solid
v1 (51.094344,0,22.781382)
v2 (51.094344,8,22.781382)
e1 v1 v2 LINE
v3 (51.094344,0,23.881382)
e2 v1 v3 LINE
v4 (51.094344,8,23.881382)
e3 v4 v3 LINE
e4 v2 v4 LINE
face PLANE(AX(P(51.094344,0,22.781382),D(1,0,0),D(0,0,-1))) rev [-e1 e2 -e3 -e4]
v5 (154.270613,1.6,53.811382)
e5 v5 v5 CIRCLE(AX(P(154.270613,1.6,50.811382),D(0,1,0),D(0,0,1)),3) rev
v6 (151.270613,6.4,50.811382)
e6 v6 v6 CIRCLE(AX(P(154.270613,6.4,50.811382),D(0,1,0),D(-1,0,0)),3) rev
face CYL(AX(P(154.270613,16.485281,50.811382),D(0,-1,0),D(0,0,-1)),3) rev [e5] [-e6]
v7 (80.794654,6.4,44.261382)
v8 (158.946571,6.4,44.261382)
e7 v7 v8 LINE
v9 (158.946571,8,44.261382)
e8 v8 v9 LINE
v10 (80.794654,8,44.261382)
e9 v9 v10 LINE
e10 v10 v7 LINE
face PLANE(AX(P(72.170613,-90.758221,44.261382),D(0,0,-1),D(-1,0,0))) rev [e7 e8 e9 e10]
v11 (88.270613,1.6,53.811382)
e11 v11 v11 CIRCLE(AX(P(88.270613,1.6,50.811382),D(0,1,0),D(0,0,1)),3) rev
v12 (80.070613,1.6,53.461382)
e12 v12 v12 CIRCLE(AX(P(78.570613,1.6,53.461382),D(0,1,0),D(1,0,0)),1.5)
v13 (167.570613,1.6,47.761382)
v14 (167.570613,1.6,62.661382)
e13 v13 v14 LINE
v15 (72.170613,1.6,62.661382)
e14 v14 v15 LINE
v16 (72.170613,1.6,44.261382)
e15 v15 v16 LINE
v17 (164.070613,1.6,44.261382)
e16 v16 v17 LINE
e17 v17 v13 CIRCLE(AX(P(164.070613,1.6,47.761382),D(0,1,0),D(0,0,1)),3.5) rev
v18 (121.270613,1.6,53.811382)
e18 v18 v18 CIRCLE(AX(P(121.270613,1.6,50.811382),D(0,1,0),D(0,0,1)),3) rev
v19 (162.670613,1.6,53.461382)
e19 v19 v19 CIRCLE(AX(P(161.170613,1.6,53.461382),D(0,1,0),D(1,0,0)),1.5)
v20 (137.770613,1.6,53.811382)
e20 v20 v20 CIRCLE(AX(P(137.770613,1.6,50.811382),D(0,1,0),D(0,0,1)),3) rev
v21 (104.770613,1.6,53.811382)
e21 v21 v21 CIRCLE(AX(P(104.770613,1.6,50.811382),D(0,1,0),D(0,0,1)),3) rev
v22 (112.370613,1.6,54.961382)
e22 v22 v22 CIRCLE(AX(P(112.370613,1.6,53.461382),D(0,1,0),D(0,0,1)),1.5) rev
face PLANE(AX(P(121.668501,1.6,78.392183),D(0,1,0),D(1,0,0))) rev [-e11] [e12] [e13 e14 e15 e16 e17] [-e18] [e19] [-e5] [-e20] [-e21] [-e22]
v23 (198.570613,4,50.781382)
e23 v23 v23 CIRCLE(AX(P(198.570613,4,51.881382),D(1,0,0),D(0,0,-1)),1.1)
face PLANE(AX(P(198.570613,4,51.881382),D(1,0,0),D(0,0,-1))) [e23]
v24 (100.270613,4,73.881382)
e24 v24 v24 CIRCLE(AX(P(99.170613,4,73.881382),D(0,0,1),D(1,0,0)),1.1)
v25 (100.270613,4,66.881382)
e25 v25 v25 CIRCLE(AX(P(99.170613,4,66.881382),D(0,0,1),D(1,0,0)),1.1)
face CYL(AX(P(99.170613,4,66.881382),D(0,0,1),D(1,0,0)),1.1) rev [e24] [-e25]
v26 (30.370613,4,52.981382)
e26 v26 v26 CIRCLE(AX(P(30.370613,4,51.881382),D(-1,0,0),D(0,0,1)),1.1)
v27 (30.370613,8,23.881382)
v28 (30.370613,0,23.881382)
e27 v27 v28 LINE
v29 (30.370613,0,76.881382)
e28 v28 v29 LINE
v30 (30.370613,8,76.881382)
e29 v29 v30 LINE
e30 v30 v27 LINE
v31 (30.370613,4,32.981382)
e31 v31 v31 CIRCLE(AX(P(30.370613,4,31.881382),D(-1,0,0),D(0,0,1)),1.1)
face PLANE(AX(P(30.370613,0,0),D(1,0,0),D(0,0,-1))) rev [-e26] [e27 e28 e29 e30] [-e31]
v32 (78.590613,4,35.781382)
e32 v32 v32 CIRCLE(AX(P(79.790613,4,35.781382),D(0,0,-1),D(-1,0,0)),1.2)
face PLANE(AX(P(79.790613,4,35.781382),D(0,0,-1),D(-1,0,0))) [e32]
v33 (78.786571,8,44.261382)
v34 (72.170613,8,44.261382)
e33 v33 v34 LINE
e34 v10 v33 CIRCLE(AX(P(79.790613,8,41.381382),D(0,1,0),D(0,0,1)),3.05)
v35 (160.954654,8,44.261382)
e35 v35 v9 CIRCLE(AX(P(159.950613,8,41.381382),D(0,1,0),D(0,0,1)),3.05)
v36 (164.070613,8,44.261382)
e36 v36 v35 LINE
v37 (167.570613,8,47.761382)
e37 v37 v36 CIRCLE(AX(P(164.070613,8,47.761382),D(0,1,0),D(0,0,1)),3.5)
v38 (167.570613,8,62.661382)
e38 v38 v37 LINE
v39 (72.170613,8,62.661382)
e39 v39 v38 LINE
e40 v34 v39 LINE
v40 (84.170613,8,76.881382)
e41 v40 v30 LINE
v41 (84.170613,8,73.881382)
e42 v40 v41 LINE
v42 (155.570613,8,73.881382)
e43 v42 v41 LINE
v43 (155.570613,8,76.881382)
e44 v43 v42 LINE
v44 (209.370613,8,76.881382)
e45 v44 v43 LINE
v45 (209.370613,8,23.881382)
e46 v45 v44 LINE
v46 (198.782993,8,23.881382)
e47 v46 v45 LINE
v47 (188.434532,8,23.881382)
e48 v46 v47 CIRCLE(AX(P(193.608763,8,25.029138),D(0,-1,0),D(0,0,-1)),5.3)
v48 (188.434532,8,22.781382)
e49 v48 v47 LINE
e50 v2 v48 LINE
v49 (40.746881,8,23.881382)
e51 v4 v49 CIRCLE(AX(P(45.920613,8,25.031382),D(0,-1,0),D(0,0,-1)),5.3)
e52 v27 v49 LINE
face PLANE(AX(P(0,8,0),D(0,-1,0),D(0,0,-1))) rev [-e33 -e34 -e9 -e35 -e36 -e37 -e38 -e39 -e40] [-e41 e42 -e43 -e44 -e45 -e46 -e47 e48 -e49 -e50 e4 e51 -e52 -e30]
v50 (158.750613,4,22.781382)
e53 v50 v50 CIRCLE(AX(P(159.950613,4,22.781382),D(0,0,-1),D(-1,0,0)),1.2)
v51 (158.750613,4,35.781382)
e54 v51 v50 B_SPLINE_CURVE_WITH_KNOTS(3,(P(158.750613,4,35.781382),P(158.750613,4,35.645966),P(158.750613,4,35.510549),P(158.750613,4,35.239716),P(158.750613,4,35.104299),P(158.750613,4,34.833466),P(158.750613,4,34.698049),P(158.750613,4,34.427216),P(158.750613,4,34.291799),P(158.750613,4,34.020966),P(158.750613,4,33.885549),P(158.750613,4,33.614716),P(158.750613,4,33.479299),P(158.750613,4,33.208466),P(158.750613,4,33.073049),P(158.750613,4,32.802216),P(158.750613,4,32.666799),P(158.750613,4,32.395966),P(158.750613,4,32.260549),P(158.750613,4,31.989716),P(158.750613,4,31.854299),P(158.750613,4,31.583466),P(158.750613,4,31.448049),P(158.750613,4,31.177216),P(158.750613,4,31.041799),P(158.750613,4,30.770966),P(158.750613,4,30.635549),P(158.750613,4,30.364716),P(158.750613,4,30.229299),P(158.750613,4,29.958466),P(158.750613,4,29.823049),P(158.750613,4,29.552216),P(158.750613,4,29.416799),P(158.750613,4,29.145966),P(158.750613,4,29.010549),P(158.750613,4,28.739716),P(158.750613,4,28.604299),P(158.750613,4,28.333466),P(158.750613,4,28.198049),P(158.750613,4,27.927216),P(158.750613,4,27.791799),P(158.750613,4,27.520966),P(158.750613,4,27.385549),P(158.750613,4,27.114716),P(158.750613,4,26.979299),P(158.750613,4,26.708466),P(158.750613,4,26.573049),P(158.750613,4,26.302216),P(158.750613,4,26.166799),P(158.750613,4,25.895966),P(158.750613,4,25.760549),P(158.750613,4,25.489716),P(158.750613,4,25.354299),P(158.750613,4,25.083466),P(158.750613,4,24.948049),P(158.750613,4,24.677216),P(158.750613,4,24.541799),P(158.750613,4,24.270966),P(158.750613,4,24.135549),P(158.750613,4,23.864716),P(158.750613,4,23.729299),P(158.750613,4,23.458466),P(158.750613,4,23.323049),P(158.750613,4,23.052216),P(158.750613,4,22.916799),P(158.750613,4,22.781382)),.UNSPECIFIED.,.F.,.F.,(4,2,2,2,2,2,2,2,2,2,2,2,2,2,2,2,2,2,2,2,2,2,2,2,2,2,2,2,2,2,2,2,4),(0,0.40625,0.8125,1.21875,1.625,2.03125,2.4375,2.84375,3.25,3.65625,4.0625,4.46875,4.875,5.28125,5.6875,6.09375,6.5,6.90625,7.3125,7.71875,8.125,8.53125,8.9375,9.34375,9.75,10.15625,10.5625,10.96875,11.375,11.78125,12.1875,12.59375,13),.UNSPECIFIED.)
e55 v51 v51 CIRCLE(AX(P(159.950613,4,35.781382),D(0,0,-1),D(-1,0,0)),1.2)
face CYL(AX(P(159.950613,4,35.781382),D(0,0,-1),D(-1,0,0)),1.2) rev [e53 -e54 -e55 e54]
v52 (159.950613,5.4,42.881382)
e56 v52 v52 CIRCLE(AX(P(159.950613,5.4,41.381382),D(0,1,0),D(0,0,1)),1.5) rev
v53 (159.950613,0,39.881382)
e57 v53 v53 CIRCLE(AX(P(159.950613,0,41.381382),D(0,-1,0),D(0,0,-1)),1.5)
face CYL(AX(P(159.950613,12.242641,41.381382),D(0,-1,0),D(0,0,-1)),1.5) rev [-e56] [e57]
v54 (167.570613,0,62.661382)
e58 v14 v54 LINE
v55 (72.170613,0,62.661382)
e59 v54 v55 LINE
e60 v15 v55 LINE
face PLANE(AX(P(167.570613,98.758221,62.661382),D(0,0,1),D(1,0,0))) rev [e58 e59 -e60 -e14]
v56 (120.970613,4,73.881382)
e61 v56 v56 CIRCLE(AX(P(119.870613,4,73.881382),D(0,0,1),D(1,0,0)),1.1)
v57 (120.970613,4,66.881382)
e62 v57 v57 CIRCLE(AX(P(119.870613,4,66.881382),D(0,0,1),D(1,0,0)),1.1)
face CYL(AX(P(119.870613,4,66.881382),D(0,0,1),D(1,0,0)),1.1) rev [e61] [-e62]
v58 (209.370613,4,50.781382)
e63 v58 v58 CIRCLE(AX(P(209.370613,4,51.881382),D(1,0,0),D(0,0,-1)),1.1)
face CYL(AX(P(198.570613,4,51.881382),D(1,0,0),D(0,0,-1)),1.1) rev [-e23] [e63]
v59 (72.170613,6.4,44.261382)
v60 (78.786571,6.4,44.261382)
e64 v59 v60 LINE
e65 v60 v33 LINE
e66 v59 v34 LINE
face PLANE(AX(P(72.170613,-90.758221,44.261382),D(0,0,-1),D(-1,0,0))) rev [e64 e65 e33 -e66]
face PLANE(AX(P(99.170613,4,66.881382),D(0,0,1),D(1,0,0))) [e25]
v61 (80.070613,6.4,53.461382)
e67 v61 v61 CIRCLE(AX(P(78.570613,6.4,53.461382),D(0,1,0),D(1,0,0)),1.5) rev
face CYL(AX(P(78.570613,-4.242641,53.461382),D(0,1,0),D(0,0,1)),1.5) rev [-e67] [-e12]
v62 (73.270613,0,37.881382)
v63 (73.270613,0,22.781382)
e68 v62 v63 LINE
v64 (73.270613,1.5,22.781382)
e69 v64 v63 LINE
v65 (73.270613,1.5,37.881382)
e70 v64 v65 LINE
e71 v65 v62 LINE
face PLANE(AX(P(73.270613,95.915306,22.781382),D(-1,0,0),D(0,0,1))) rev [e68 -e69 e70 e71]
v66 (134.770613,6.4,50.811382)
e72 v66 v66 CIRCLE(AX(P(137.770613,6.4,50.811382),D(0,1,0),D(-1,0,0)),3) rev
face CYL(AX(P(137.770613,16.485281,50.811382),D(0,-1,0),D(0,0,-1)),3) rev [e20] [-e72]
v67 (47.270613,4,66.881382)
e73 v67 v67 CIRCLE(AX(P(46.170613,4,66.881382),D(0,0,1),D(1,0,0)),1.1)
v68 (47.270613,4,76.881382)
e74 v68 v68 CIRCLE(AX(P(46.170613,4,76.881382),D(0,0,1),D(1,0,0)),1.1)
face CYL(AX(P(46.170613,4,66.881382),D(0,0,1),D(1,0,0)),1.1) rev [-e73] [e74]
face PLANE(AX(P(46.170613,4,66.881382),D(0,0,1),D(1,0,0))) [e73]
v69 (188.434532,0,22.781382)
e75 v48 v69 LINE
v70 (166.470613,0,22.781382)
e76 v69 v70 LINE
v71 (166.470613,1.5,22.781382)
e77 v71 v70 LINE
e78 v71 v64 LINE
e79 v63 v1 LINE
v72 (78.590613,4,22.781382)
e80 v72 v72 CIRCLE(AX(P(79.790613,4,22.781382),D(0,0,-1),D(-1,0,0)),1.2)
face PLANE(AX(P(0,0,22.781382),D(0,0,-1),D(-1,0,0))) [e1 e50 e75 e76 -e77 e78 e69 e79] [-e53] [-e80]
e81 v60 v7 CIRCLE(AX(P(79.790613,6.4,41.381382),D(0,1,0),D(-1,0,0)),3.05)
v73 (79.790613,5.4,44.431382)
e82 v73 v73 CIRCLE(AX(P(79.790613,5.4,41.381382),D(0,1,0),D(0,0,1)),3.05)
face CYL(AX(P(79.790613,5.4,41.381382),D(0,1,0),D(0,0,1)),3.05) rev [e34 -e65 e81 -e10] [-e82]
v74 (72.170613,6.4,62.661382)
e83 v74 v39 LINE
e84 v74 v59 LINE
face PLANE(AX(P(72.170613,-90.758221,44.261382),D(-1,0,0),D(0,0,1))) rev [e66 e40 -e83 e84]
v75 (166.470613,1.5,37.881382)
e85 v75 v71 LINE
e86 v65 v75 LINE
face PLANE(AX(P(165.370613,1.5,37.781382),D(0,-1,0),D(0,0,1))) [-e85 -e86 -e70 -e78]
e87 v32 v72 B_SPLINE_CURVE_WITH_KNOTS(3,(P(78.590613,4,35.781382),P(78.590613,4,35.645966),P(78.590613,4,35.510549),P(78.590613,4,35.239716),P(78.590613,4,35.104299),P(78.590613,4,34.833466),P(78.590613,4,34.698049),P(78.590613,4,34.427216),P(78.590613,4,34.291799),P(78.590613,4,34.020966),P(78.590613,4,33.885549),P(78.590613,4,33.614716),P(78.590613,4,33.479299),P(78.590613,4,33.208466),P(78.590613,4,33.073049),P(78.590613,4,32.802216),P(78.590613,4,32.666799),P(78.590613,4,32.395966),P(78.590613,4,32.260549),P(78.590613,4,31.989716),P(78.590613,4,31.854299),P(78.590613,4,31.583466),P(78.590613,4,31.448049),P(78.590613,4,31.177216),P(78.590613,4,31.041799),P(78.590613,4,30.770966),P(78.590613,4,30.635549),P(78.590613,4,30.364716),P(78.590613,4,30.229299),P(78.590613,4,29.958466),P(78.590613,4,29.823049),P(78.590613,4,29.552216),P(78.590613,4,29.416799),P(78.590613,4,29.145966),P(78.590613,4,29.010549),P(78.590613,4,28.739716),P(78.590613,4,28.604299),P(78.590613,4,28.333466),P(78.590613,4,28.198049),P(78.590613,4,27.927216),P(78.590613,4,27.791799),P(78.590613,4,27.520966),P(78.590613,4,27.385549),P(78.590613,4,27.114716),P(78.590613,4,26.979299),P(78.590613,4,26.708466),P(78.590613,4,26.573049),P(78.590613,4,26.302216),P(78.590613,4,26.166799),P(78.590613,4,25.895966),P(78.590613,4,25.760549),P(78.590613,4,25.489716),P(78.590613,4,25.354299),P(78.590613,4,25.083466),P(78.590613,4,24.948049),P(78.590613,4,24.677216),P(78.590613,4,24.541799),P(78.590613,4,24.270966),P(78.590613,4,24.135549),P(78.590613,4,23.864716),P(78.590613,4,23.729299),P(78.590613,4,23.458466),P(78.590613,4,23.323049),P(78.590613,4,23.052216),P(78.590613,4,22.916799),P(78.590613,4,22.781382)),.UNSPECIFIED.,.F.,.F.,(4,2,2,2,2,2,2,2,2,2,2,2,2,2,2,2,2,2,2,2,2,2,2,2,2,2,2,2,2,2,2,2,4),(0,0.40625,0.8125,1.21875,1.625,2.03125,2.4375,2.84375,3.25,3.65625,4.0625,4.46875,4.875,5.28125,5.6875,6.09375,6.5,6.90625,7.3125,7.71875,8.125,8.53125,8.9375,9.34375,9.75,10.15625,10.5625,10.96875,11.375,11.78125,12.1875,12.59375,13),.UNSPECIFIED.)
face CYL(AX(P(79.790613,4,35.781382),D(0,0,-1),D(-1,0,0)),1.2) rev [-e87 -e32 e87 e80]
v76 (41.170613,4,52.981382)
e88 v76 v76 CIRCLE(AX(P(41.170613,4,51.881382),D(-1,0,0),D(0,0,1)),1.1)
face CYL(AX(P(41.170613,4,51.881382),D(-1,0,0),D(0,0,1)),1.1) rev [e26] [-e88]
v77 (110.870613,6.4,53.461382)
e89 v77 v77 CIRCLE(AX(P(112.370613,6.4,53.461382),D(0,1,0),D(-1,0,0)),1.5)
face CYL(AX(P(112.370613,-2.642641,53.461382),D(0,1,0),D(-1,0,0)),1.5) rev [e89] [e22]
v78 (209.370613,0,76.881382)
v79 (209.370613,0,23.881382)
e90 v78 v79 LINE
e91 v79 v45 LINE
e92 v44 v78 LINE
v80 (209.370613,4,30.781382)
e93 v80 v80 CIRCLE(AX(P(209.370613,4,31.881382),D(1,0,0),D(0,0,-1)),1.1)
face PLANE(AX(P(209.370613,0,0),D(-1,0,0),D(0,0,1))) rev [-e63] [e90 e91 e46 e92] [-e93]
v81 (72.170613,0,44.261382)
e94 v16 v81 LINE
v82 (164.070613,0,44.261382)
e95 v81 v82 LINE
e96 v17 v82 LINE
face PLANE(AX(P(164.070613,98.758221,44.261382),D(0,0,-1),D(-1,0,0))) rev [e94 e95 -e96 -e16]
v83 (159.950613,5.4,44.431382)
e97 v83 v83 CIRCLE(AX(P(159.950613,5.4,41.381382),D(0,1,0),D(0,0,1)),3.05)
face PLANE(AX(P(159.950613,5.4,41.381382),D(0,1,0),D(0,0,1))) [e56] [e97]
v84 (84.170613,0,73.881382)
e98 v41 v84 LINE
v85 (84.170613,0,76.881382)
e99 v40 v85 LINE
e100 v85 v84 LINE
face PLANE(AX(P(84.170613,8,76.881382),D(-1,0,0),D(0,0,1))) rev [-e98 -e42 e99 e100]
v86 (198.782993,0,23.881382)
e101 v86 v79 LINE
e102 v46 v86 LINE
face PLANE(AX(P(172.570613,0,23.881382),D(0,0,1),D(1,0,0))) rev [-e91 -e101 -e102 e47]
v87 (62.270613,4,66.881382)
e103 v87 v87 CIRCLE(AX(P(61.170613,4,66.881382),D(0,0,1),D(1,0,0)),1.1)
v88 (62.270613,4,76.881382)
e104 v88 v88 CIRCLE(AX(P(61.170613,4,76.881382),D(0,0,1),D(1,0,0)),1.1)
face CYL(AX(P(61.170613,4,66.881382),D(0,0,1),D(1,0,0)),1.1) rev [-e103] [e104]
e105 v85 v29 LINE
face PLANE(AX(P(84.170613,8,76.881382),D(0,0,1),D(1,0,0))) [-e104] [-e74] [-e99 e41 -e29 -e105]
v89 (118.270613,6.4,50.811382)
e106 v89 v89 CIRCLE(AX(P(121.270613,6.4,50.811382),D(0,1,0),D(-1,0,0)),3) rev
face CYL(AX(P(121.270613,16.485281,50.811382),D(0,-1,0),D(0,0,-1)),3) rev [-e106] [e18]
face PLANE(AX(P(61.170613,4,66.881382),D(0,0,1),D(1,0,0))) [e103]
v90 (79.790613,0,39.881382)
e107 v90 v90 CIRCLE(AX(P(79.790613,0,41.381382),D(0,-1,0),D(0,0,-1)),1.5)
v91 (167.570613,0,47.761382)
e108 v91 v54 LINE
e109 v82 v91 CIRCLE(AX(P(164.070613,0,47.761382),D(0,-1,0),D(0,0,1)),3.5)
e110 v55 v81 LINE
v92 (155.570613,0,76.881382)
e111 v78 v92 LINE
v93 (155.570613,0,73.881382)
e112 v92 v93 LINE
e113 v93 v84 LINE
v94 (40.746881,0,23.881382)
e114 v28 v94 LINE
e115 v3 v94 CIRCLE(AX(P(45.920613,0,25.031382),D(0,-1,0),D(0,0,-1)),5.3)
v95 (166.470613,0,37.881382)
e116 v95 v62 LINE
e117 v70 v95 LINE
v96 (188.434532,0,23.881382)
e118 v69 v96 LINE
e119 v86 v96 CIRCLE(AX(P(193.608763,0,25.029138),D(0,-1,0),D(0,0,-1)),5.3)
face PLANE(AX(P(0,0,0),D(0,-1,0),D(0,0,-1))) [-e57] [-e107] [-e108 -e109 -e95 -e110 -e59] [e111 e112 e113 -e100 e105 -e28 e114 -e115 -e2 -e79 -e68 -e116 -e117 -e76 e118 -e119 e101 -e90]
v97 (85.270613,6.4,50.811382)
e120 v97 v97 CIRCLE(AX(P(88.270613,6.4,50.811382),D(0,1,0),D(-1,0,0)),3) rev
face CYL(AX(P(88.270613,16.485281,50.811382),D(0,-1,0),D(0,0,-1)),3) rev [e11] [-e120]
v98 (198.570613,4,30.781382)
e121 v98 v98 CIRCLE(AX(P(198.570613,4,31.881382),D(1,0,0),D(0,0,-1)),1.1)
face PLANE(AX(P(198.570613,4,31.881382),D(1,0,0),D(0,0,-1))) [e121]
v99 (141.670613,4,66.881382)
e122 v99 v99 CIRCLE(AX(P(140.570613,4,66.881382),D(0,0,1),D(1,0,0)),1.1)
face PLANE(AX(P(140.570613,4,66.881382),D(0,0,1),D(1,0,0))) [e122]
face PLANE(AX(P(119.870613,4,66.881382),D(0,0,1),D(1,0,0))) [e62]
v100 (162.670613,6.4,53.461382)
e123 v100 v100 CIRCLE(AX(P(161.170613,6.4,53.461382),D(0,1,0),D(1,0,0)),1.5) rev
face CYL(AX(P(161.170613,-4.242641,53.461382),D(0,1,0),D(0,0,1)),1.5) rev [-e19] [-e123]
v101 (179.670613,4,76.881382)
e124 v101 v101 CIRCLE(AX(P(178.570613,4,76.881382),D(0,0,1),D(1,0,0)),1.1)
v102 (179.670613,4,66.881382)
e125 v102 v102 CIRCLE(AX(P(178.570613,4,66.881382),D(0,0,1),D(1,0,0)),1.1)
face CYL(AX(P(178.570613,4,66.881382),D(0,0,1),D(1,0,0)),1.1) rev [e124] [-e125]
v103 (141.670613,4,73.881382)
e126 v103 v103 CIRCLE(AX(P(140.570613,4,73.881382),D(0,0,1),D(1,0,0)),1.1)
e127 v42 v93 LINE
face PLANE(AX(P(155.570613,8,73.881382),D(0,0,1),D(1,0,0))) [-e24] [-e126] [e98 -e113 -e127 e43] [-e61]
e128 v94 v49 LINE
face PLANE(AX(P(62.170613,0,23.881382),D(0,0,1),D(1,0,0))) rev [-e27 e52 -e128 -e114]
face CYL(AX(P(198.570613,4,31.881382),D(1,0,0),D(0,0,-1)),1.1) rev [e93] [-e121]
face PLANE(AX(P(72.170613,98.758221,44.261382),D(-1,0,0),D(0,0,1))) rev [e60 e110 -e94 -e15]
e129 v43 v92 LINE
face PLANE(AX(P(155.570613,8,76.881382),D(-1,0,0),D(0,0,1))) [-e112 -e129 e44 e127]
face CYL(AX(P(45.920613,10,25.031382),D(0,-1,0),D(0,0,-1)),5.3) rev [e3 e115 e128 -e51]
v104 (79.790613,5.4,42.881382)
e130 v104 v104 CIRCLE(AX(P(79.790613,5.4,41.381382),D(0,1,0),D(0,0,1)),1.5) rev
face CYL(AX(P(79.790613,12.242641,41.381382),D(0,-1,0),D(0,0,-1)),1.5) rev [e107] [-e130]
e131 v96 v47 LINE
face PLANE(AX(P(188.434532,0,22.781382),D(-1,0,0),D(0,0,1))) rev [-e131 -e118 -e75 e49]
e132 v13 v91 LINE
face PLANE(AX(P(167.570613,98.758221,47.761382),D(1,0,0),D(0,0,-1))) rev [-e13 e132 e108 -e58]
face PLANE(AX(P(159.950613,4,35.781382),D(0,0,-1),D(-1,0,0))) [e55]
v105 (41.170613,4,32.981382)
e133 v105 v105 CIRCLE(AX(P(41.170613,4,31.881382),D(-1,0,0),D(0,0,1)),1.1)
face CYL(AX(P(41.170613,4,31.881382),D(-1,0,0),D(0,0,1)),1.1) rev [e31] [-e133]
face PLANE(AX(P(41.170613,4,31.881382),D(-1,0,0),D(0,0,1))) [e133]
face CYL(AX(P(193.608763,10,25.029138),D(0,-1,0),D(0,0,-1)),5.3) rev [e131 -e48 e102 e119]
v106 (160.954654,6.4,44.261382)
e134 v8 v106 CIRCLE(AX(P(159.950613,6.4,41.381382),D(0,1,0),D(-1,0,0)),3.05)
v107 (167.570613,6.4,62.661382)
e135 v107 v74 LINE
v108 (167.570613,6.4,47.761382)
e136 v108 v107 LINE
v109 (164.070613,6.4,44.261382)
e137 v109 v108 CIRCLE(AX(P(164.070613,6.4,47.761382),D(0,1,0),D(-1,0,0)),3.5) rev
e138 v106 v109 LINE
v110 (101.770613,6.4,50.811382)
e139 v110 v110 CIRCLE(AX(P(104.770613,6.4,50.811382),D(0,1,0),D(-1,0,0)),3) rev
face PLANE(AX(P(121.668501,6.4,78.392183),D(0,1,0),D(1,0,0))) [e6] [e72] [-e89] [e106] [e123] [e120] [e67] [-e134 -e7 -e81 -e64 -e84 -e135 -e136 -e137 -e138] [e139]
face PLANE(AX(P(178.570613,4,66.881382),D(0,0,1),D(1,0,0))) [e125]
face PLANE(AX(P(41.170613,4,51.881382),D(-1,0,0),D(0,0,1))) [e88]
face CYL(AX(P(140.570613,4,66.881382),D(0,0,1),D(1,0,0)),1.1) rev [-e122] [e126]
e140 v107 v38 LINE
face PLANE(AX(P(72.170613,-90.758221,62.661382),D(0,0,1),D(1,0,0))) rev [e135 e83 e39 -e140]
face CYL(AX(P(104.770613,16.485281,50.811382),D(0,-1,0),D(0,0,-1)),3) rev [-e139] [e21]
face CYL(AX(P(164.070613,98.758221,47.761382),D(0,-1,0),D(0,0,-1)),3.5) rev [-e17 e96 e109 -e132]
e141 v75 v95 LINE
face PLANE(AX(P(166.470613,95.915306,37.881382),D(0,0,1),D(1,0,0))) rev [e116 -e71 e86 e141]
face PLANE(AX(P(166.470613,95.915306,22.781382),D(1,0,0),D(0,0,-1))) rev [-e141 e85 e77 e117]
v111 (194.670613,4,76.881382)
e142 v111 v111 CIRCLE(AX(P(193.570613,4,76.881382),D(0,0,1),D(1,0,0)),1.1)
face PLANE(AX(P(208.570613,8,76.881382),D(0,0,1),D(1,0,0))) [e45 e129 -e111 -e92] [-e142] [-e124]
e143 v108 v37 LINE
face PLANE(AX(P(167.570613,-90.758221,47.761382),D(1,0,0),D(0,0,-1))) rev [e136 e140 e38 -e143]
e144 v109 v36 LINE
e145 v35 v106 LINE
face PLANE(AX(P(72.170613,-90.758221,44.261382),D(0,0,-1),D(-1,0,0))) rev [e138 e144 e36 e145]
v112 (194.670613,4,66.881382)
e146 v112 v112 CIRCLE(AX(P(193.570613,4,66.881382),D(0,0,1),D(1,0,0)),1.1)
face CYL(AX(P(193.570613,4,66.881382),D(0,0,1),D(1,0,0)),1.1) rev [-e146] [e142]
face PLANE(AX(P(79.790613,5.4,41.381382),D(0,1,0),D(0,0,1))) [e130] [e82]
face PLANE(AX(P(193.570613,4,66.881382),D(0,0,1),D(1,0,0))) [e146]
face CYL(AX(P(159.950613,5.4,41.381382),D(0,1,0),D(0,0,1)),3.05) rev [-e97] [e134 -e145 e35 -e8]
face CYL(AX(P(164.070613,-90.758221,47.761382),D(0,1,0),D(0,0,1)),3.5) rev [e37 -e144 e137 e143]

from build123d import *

# Parameters (mm, degrees)
DODANIE_WYCI_GNI_CIE1_DEPTH = 8
SZKIC7_R                    = 1.1
WYTNIJ_WYCI_GNI_CIE3_DEPTH  = 10
WYTNIJ_WYCI_GNI_CIE4_START  = -10
SZKIC8_R                    = 1.1
WYTNIJ_WYCI_GNI_CIE4_DEPTH  = 10
SZKIC9_R                    = 1.1
WYTNIJ_WYCI_GNI_CIE5_DEPTH  = 10
SZKIC11_R                   = 5.3
WYTNIJ_WYCI_GNI_CIE7_DEPTH  = 10
SZKIC12_W                   = 31
SZKIC12_H                   = 15
SZKIC12_W_2                 = 36
SZKIC12_H_2                 = 17
WYTNIJ_WYCI_GNI_CIE8_DEPTH  = 223.433017814
SZKIC13_W                   = 110.4
SZKIC13_H                   = 8
DODANIE_WYCI_GNI_CIE3_DEPTH = 5
SZKIC14_W                   = 137.340188064
SZKIC14_H                   = 8
DODANIE_WYCI_GNI_CIE4_DEPTH = 1.1
DODANIE_WYCI_GNI_CIE5_START = 0.8
SZKIC15_W                   = 53
SZKIC15_H                   = 8
SZKIC15_R                   = 1.1
DODANIE_WYCI_GNI_CIE5_DEPTH = 0.8
SZKIC16_W                   = 53
SZKIC16_H                   = 8
SZKIC16_R                   = 1.1
DODANIE_WYCI_GNI_CIE6_DEPTH = 0.8
GNIAZDO1_START              = 87.470612667
GNIAZDO1_OUTLINE_W          = 8
GNIAZDO1_OUTLINE_H          = 4.7
GNIAZDO1_DEPTH              = 1.6
GNIAZDO1_START_2            = 103.970612667
GNIAZDO1_2_OUTLINE_W        = 8
GNIAZDO1_2_OUTLINE_H        = 4.7
GNIAZDO1_2_DEPTH            = 1.6
GNIAZDO1_START_3            = 120.470612667
GNIAZDO1_3_OUTLINE_W        = 8
GNIAZDO1_3_OUTLINE_H        = 4.7
GNIAZDO1_3_DEPTH            = 1.6
GNIAZDO1_START_4            = 136.970612667
GNIAZDO1_4_OUTLINE_W        = 8
GNIAZDO1_4_OUTLINE_H        = 4.7
GNIAZDO1_4_DEPTH            = 1.6
GNIAZDO1_START_5            = 153.470612667
GNIAZDO1_5_OUTLINE_W        = 8
GNIAZDO1_5_OUTLINE_H        = 4.7
GNIAZDO1_5_DEPTH            = 1.6
SZKIC17_R                   = 3
WYTNIJ_WYCI_GNI_CIE9_DEPTH  = 8
SZKIC18_R                   = 1.5
WYTNIJ_WYCI_GNI_CIE10_DEPTH = 8
GNIAZDO2_START              = 6.4
GNIAZDO2_OUTLINE_R          = 1.5
GNIAZDO2_OUTLINE_R_2        = 3
GNIAZDO2_DEPTH              = 1.6
GNIAZDO4_OUTLINE_R          = 1.5
GNIAZDO4_OUTLINE_R_2        = 3
GNIAZDO4_DEPTH              = 1.6
WYTNIJ_WYCI_GNI_CIE11_DEPTH = 1.6
WYTNIJ_WYCI_GNI_CIE12_START = -1.6
WYTNIJ_WYCI_GNI_CIE12_DEPTH = 1.6
GNIAZDO5_START              = 22.781382309
GNIAZDO5_DEPTH              = 15
SZKIC21_W                   = 93.2
SZKIC21_H                   = 15.1
WYTNIJ_WYCI_GNI_CIE13_DEPTH = 1.5
SZKIC22_R                   = 1.5
WYTNIJ_WYCI_GNI_CIE14_DEPTH = 4.8
SZKIC26_R                   = 1.5
WYTNIJ_WYCI_GNI_CIE18_DEPTH = 8
SZKIC27_R                   = 3.05
WYTNIJ_WYCI_GNI_CIE19_DEPTH = 2.6
SZKIC28_R                   = 1.2
WYTNIJ_WYCI_GNI_CIE20_DEPTH = 13


# Read off the part's stored shape, not the designer's step: Gniazdo1, Gniazdo2, Gniazdo4, Gniazdo5
with BuildPart() as part:
    # Szkic1 → Dodanie-wyciągnięcie1 (new body)
    with BuildSketch(Plane(origin=(0, 0, 0), x_dir=(1, 0, 0), z_dir=(0, 1, 0))):
        Polygon((62.170612667, -8.881382309), (62.170612667, -28.881382309), (172.570612667, -28.881382309), (172.570612667, -6.881382309), (208.570612667, -6.881382309), (208.570612667, -76.881382309), (155.570612667, -76.881382309), (155.570612667, -73.881382309), (84.170612667, -73.881382309), (84.170612667, -76.881382309), (31.170612667, -76.881382309), (31.170612667, -8.881382309), align=None)
    extrude(amount=DODANIE_WYCI_GNI_CIE1_DEPTH)

    # Szkic7 → Wytnij-wyciągnięcie3 (cut)
    with BuildSketch(Plane(origin=(208.570612667, 0, 0), x_dir=(0, 0, -1), z_dir=(1, 0, 0))):
        with Locations((-31.881382309, 4)):
            Circle(SZKIC7_R)
        with Locations((-51.881382309, 4)):
            Circle(SZKIC7_R)
    extrude(amount=-WYTNIJ_WYCI_GNI_CIE3_DEPTH, mode=Mode.SUBTRACT)

    # Szkic8 → Wytnij-wyciągnięcie4 (cut)
    with BuildSketch(Plane.ZY.offset(-31.170612667).offset(WYTNIJ_WYCI_GNI_CIE4_START)):
        with Locations(Location((31.881382309, 4, 0), (0, 0, 180))):
            Circle(SZKIC8_R)
        with Locations(Location((51.881382309, 4, 0), (0, 0, 180))):
            Circle(SZKIC8_R)
    extrude(amount=WYTNIJ_WYCI_GNI_CIE4_DEPTH, mode=Mode.SUBTRACT)

    # Szkic9 → Wytnij-wyciągnięcie5 (cut)
    with BuildSketch(Plane.XY.offset(76.881382309)):
        with Locations((46.170612667, 4)):
            Circle(SZKIC9_R)
        with Locations((193.570612667, 4)):
            Circle(SZKIC9_R)
        with Locations((178.570612667, 4)):
            Circle(SZKIC9_R)
        with Locations((61.170612667, 4)):
            Circle(SZKIC9_R)
        with Locations((99.170612667, 4)):
            Circle(SZKIC9_R)
        with Locations((140.570612667, 4)):
            Circle(SZKIC9_R)
        with Locations((119.870612667, 4)):
            Circle(SZKIC9_R)
    extrude(amount=-WYTNIJ_WYCI_GNI_CIE5_DEPTH, mode=Mode.SUBTRACT)

    # Szkic11 → Wytnij-wyciągnięcie7 (cut)
    with BuildSketch(Plane.XZ):
        with Locations(Location((45.920612667, 25.031382309, 0), (0, 0, 270))):
            Circle(SZKIC11_R)
        with Locations(Location((193.608762528, 25.029138033, 0), (0, 0, 270))):
            Circle(SZKIC11_R)
    extrude(amount=-WYTNIJ_WYCI_GNI_CIE7_DEPTH, mode=Mode.SUBTRACT)

    # Szkic12 → Wytnij-wyciągnięcie8 (cut, through all)
    with BuildSketch(Plane(origin=(0, 8, 0), x_dir=(1, 0, 0), z_dir=(0, 1, 0))):
        with Locations((46.670612667, -16.381382309)):
            Rectangle(SZKIC12_W, SZKIC12_H)
        with Locations((190.570612667, -15.381382309)):
            Rectangle(SZKIC12_W_2, SZKIC12_H_2)
    extrude(amount=-WYTNIJ_WYCI_GNI_CIE8_DEPTH, mode=Mode.SUBTRACT)

    # Szkic13 → Dodanie-wyciągnięcie3 (add)
    with BuildSketch(Plane(origin=(0, 0, 28.881382309), x_dir=(-1, 0, 0), z_dir=(0, 0, -1))):
        with Locations((-117.370612667, 4)):
            Rectangle(SZKIC13_W, SZKIC13_H)
    extrude(amount=DODANIE_WYCI_GNI_CIE3_DEPTH)

    # Szkic14 → Dodanie-wyciągnięcie4 (add)
    with BuildSketch(Plane(origin=(0, 0, 23.881382309), x_dir=(-1, 0, 0), z_dir=(0, 0, -1))):
        with Locations((-119.764438428, 4)):
            Rectangle(SZKIC14_W, SZKIC14_H)
    extrude(amount=DODANIE_WYCI_GNI_CIE4_DEPTH)

    # Szkic15 → Dodanie-wyciągnięcie5 (add)
    with BuildSketch(Plane(origin=(208.570612667, 0, 0), x_dir=(0, 0, -1), z_dir=(1, 0, 0)).offset(DODANIE_WYCI_GNI_CIE5_START)):
        with Locations((-50.381382309, 4)):
            Rectangle(SZKIC15_W, SZKIC15_H)
        with Locations(Location((-31.881382309, 4, 0), (0, 0, 180))):
            Circle(SZKIC15_R, mode=Mode.SUBTRACT)
        with Locations(Location((-51.881382309, 4, 0), (0, 0, 180))):
            Circle(SZKIC15_R, mode=Mode.SUBTRACT)
    extrude(amount=-DODANIE_WYCI_GNI_CIE5_DEPTH)

    # Szkic16 → Dodanie-wyciągnięcie6 (add)
    with BuildSketch(Plane.ZY.offset(-31.170612667)):
        with Locations((50.381382309, 4)):
            Rectangle(SZKIC16_W, SZKIC16_H)
        with Locations(Location((31.881382309, 4, 0), (0, 0, 180))):
            Circle(SZKIC16_R, mode=Mode.SUBTRACT)
        with Locations(Location((51.881382309, 4, 0), (0, 0, 180))):
            Circle(SZKIC16_R, mode=Mode.SUBTRACT)
    extrude(amount=DODANIE_WYCI_GNI_CIE6_DEPTH)

    # Gniazdo1 outline → Gniazdo1 (cut)
    with BuildSketch(Plane.YZ.offset(GNIAZDO1_START)):
        with Locations((4, 50.811382309)):
            Rectangle(GNIAZDO1_OUTLINE_W, GNIAZDO1_OUTLINE_H)
    extrude(amount=GNIAZDO1_DEPTH, mode=Mode.SUBTRACT)

    # Gniazdo1 2 outline → Gniazdo1 2 (cut)
    with BuildSketch(Plane.YZ.offset(GNIAZDO1_START_2)):
        with Locations((4, 50.811382309)):
            Rectangle(GNIAZDO1_2_OUTLINE_W, GNIAZDO1_2_OUTLINE_H)
    extrude(amount=GNIAZDO1_2_DEPTH, mode=Mode.SUBTRACT)

    # Gniazdo1 3 outline → Gniazdo1 3 (cut)
    with BuildSketch(Plane.YZ.offset(GNIAZDO1_START_3)):
        with Locations((4, 50.811382309)):
            Rectangle(GNIAZDO1_3_OUTLINE_W, GNIAZDO1_3_OUTLINE_H)
    extrude(amount=GNIAZDO1_3_DEPTH, mode=Mode.SUBTRACT)

    # Gniazdo1 4 outline → Gniazdo1 4 (cut)
    with BuildSketch(Plane.YZ.offset(GNIAZDO1_START_4)):
        with Locations((4, 50.811382309)):
            Rectangle(GNIAZDO1_4_OUTLINE_W, GNIAZDO1_4_OUTLINE_H)
    extrude(amount=GNIAZDO1_4_DEPTH, mode=Mode.SUBTRACT)

    # Gniazdo1 5 outline → Gniazdo1 5 (cut)
    with BuildSketch(Plane.YZ.offset(GNIAZDO1_START_5)):
        with Locations((4, 50.811382309)):
            Rectangle(GNIAZDO1_5_OUTLINE_W, GNIAZDO1_5_OUTLINE_H)
    extrude(amount=GNIAZDO1_5_DEPTH, mode=Mode.SUBTRACT)

    # Szkic17 → Wytnij-wyciągnięcie9 (cut)
    with BuildSketch(Plane.XZ):
        with Locations(Location((88.270612667, 50.811382309, 0), (0, 0, 270))):
            Circle(SZKIC17_R)
        with Locations(Location((104.770612667, 50.811382309, 0), (0, 0, 270))):
            Circle(SZKIC17_R)
        with Locations(Location((121.270612667, 50.811382309, 0), (0, 0, 270))):
            Circle(SZKIC17_R)
        with Locations(Location((137.770612667, 50.811382309, 0), (0, 0, 270))):
            Circle(SZKIC17_R)
        with Locations(Location((154.270612667, 50.811382309, 0), (0, 0, 270))):
            Circle(SZKIC17_R)
    extrude(amount=-WYTNIJ_WYCI_GNI_CIE9_DEPTH, mode=Mode.SUBTRACT)

    # Szkic18 → Wytnij-wyciągnięcie10 (cut)
    with BuildSketch(Plane(origin=(0, 8, 0), x_dir=(1, 0, 0), z_dir=(0, 1, 0))):
        with Locations(Location((161.170612667, -53.461382308, 0), (0, 0, 270))):
            Circle(SZKIC18_R)
        with Locations(Location((78.570612667, -53.461382309, 0), (0, 0, 270))):
            Circle(SZKIC18_R)
    extrude(amount=-WYTNIJ_WYCI_GNI_CIE10_DEPTH, mode=Mode.SUBTRACT)

    # Gniazdo2 outline → Gniazdo2 (cut)
    with BuildSketch(Plane(origin=(0, 0, 0), x_dir=(1, 0, 0), z_dir=(0, 1, 0)).offset(GNIAZDO2_START)):
        with BuildLine():
            Line((72.370612667, -44.461382309), (72.370612667, -62.461382309))
            Line((72.370612667, -62.461382309), (167.370612667, -62.461382309))
            Line((167.370612667, -62.461382309), (167.370612667, -47.961382309))
            ThreePointArc((167.370612667, -47.961382309), (166.345486401, -45.486508575), (163.870612667, -44.461382309))
            Line((163.870612667, -44.461382309), (72.370612667, -44.461382309))
        make_face()
        with Locations((78.570612667, -53.461382309)):
            Circle(GNIAZDO2_OUTLINE_R, mode=Mode.SUBTRACT)
        with Locations((112.370612667, -53.461382309)):
            Circle(GNIAZDO2_OUTLINE_R, mode=Mode.SUBTRACT)
        with Locations((88.270612667, -50.811382309)):
            Circle(GNIAZDO2_OUTLINE_R_2, mode=Mode.SUBTRACT)
        with Locations((104.770612667, -50.811382309)):
            Circle(GNIAZDO2_OUTLINE_R_2, mode=Mode.SUBTRACT)
        with Locations((121.270612667, -50.811382309)):
            Circle(GNIAZDO2_OUTLINE_R_2, mode=Mode.SUBTRACT)
        with Locations((137.770612667, -50.811382309)):
            Circle(GNIAZDO2_OUTLINE_R_2, mode=Mode.SUBTRACT)
        with Locations((161.170612667, -53.461382308)):
            Circle(GNIAZDO2_OUTLINE_R, mode=Mode.SUBTRACT)
        with Locations((154.270612667, -50.811382309)):
            Circle(GNIAZDO2_OUTLINE_R_2, mode=Mode.SUBTRACT)
    extrude(amount=GNIAZDO2_DEPTH, mode=Mode.SUBTRACT)

    # Gniazdo4 outline → Gniazdo4 (cut)
    with BuildSketch(Plane(origin=(0, 0, 0), x_dir=(1, 0, 0), z_dir=(0, 1, 0))):
        with BuildLine():
            Line((72.370612667, -44.461382309), (72.370612667, -62.461382309))
            Line((72.370612667, -62.461382309), (167.370612667, -62.461382309))
            Line((167.370612667, -62.461382309), (167.370612667, -47.961382309))
            ThreePointArc((167.370612667, -47.961382309), (166.345486401, -45.486508575), (163.870612667, -44.461382309))
            Line((163.870612667, -44.461382309), (72.370612667, -44.461382309))
        make_face()
        with Locations((78.570612667, -53.461382309)):
            Circle(GNIAZDO4_OUTLINE_R, mode=Mode.SUBTRACT)
        with Locations((112.370612667, -53.461382309)):
            Circle(GNIAZDO4_OUTLINE_R, mode=Mode.SUBTRACT)
        with Locations((88.270612667, -50.811382309)):
            Circle(GNIAZDO4_OUTLINE_R_2, mode=Mode.SUBTRACT)
        with Locations((104.770612667, -50.811382309)):
            Circle(GNIAZDO4_OUTLINE_R_2, mode=Mode.SUBTRACT)
        with Locations((121.270612667, -50.811382309)):
            Circle(GNIAZDO4_OUTLINE_R_2, mode=Mode.SUBTRACT)
        with Locations((137.770612667, -50.811382309)):
            Circle(GNIAZDO4_OUTLINE_R_2, mode=Mode.SUBTRACT)
        with Locations((161.170612667, -53.461382308)):
            Circle(GNIAZDO4_OUTLINE_R, mode=Mode.SUBTRACT)
        with Locations((154.270612667, -50.811382309)):
            Circle(GNIAZDO4_OUTLINE_R_2, mode=Mode.SUBTRACT)
    extrude(amount=GNIAZDO4_DEPTH, mode=Mode.SUBTRACT)

    # Szkic19 → Wytnij-wyciągnięcie11 (cut)
    with BuildSketch(Plane.XZ):
        with BuildLine():
            Line((164.070612667, 44.261382309), (72.170612667, 44.261382309))
            Line((72.170612667, 44.261382309), (72.170612667, 62.661382309))
            Line((72.170612667, 62.661382309), (167.570612667, 62.661382309))
            Line((167.570612667, 62.661382309), (167.570612667, 47.761382309))
            ThreePointArc((167.570612667, 47.761382309), (166.545486401, 45.286508575), (164.070612667, 44.261382309))
        make_face()
    extrude(amount=-WYTNIJ_WYCI_GNI_CIE11_DEPTH, mode=Mode.SUBTRACT)

    # Szkic20 → Wytnij-wyciągnięcie12 (cut)
    with BuildSketch(Plane(origin=(0, 8, 0), x_dir=(1, 0, 0), z_dir=(0, 1, 0)).offset(WYTNIJ_WYCI_GNI_CIE12_START)):
        with BuildLine():
            Line((72.170612667, -44.261382309), (164.070612667, -44.261382309))
            ThreePointArc((164.070612667, -44.261382309), (166.545486401, -45.286508575), (167.570612667, -47.761382309))
            Line((167.570612667, -47.761382309), (167.570612667, -62.661382309))
            Line((167.570612667, -62.661382309), (72.170612667, -62.661382309))
            Line((72.170612667, -62.661382309), (72.170612667, -44.261382309))
        make_face()
    extrude(amount=WYTNIJ_WYCI_GNI_CIE12_DEPTH, mode=Mode.SUBTRACT)

    # Gniazdo5 outline → Gniazdo5 (cut)
    with BuildSketch(Plane.XY.offset(GNIAZDO5_START)):
        with BuildLine():
            Line((166.370612667, 0), (166.370612667, 0.5))
            ThreePointArc((166.370612667, 0.5), (166.077719448, 1.207106781), (165.370612667, 1.5))
            Line((165.370612667, 1.5), (74.370612667, 1.5))
            ThreePointArc((74.370612667, 1.5), (73.663505886, 1.207106781), (73.370612667, 0.5))
            Line((73.370612667, 0.5), (73.370612667, 0))
            Line((73.370612667, 0), (166.370612667, 0))
        make_face()
    extrude(amount=GNIAZDO5_DEPTH, mode=Mode.SUBTRACT)

    # Szkic21 → Wytnij-wyciągnięcie13 (cut)
    with BuildSketch(Plane.XZ):
        with Locations((119.870612667, 30.331382309)):
            Rectangle(SZKIC21_W, SZKIC21_H)
    extrude(amount=-WYTNIJ_WYCI_GNI_CIE13_DEPTH, mode=Mode.SUBTRACT)

    # Szkic22 → Wytnij-wyciągnięcie14 (cut)
    with BuildSketch(Plane(origin=(0, 6.4, 0), x_dir=(1, 0, 0), z_dir=(0, 1, 0))):
        with Locations(Location((112.370612667, -53.461382309, 0), (0, 0, 180))):
            Circle(SZKIC22_R)
    extrude(amount=-WYTNIJ_WYCI_GNI_CIE14_DEPTH, mode=Mode.SUBTRACT)

    # Szkic26 → Wytnij-wyciągnięcie18 (cut)
    with BuildSketch(Plane.XZ):
        with Locations(Location((79.790612667, 41.381382309, 0), (0, 0, 270))):
            Circle(SZKIC26_R)
        with Locations(Location((159.950612667, 41.381382309, 0), (0, 0, 270))):
            Circle(SZKIC26_R)
    extrude(amount=-WYTNIJ_WYCI_GNI_CIE18_DEPTH, mode=Mode.SUBTRACT)

    # Szkic27 → Wytnij-wyciągnięcie19 (cut)
    with BuildSketch(Plane(origin=(0, 8, 0), x_dir=(1, 0, 0), z_dir=(0, 1, 0))):
        with Locations(Location((79.790612667, -41.381382309, 0), (0, 0, 270))):
            Circle(SZKIC27_R)
        with Locations(Location((159.950612667, -41.381382309, 0), (0, 0, 270))):
            Circle(SZKIC27_R)
    extrude(amount=-WYTNIJ_WYCI_GNI_CIE19_DEPTH, mode=Mode.SUBTRACT)

    # Szkic28 → Wytnij-wyciągnięcie20 (cut)
    with BuildSketch(Plane(origin=(0, 0, 22.781382309), x_dir=(-1, 0, 0), z_dir=(0, 0, -1))):
        with Locations((-159.950612667, 4)):
            Circle(SZKIC28_R)
        with Locations((-79.790612667, 4)):
            Circle(SZKIC28_R)
    extrude(amount=-WYTNIJ_WYCI_GNI_CIE20_DEPTH, mode=Mode.SUBTRACT)


solid = part.part
